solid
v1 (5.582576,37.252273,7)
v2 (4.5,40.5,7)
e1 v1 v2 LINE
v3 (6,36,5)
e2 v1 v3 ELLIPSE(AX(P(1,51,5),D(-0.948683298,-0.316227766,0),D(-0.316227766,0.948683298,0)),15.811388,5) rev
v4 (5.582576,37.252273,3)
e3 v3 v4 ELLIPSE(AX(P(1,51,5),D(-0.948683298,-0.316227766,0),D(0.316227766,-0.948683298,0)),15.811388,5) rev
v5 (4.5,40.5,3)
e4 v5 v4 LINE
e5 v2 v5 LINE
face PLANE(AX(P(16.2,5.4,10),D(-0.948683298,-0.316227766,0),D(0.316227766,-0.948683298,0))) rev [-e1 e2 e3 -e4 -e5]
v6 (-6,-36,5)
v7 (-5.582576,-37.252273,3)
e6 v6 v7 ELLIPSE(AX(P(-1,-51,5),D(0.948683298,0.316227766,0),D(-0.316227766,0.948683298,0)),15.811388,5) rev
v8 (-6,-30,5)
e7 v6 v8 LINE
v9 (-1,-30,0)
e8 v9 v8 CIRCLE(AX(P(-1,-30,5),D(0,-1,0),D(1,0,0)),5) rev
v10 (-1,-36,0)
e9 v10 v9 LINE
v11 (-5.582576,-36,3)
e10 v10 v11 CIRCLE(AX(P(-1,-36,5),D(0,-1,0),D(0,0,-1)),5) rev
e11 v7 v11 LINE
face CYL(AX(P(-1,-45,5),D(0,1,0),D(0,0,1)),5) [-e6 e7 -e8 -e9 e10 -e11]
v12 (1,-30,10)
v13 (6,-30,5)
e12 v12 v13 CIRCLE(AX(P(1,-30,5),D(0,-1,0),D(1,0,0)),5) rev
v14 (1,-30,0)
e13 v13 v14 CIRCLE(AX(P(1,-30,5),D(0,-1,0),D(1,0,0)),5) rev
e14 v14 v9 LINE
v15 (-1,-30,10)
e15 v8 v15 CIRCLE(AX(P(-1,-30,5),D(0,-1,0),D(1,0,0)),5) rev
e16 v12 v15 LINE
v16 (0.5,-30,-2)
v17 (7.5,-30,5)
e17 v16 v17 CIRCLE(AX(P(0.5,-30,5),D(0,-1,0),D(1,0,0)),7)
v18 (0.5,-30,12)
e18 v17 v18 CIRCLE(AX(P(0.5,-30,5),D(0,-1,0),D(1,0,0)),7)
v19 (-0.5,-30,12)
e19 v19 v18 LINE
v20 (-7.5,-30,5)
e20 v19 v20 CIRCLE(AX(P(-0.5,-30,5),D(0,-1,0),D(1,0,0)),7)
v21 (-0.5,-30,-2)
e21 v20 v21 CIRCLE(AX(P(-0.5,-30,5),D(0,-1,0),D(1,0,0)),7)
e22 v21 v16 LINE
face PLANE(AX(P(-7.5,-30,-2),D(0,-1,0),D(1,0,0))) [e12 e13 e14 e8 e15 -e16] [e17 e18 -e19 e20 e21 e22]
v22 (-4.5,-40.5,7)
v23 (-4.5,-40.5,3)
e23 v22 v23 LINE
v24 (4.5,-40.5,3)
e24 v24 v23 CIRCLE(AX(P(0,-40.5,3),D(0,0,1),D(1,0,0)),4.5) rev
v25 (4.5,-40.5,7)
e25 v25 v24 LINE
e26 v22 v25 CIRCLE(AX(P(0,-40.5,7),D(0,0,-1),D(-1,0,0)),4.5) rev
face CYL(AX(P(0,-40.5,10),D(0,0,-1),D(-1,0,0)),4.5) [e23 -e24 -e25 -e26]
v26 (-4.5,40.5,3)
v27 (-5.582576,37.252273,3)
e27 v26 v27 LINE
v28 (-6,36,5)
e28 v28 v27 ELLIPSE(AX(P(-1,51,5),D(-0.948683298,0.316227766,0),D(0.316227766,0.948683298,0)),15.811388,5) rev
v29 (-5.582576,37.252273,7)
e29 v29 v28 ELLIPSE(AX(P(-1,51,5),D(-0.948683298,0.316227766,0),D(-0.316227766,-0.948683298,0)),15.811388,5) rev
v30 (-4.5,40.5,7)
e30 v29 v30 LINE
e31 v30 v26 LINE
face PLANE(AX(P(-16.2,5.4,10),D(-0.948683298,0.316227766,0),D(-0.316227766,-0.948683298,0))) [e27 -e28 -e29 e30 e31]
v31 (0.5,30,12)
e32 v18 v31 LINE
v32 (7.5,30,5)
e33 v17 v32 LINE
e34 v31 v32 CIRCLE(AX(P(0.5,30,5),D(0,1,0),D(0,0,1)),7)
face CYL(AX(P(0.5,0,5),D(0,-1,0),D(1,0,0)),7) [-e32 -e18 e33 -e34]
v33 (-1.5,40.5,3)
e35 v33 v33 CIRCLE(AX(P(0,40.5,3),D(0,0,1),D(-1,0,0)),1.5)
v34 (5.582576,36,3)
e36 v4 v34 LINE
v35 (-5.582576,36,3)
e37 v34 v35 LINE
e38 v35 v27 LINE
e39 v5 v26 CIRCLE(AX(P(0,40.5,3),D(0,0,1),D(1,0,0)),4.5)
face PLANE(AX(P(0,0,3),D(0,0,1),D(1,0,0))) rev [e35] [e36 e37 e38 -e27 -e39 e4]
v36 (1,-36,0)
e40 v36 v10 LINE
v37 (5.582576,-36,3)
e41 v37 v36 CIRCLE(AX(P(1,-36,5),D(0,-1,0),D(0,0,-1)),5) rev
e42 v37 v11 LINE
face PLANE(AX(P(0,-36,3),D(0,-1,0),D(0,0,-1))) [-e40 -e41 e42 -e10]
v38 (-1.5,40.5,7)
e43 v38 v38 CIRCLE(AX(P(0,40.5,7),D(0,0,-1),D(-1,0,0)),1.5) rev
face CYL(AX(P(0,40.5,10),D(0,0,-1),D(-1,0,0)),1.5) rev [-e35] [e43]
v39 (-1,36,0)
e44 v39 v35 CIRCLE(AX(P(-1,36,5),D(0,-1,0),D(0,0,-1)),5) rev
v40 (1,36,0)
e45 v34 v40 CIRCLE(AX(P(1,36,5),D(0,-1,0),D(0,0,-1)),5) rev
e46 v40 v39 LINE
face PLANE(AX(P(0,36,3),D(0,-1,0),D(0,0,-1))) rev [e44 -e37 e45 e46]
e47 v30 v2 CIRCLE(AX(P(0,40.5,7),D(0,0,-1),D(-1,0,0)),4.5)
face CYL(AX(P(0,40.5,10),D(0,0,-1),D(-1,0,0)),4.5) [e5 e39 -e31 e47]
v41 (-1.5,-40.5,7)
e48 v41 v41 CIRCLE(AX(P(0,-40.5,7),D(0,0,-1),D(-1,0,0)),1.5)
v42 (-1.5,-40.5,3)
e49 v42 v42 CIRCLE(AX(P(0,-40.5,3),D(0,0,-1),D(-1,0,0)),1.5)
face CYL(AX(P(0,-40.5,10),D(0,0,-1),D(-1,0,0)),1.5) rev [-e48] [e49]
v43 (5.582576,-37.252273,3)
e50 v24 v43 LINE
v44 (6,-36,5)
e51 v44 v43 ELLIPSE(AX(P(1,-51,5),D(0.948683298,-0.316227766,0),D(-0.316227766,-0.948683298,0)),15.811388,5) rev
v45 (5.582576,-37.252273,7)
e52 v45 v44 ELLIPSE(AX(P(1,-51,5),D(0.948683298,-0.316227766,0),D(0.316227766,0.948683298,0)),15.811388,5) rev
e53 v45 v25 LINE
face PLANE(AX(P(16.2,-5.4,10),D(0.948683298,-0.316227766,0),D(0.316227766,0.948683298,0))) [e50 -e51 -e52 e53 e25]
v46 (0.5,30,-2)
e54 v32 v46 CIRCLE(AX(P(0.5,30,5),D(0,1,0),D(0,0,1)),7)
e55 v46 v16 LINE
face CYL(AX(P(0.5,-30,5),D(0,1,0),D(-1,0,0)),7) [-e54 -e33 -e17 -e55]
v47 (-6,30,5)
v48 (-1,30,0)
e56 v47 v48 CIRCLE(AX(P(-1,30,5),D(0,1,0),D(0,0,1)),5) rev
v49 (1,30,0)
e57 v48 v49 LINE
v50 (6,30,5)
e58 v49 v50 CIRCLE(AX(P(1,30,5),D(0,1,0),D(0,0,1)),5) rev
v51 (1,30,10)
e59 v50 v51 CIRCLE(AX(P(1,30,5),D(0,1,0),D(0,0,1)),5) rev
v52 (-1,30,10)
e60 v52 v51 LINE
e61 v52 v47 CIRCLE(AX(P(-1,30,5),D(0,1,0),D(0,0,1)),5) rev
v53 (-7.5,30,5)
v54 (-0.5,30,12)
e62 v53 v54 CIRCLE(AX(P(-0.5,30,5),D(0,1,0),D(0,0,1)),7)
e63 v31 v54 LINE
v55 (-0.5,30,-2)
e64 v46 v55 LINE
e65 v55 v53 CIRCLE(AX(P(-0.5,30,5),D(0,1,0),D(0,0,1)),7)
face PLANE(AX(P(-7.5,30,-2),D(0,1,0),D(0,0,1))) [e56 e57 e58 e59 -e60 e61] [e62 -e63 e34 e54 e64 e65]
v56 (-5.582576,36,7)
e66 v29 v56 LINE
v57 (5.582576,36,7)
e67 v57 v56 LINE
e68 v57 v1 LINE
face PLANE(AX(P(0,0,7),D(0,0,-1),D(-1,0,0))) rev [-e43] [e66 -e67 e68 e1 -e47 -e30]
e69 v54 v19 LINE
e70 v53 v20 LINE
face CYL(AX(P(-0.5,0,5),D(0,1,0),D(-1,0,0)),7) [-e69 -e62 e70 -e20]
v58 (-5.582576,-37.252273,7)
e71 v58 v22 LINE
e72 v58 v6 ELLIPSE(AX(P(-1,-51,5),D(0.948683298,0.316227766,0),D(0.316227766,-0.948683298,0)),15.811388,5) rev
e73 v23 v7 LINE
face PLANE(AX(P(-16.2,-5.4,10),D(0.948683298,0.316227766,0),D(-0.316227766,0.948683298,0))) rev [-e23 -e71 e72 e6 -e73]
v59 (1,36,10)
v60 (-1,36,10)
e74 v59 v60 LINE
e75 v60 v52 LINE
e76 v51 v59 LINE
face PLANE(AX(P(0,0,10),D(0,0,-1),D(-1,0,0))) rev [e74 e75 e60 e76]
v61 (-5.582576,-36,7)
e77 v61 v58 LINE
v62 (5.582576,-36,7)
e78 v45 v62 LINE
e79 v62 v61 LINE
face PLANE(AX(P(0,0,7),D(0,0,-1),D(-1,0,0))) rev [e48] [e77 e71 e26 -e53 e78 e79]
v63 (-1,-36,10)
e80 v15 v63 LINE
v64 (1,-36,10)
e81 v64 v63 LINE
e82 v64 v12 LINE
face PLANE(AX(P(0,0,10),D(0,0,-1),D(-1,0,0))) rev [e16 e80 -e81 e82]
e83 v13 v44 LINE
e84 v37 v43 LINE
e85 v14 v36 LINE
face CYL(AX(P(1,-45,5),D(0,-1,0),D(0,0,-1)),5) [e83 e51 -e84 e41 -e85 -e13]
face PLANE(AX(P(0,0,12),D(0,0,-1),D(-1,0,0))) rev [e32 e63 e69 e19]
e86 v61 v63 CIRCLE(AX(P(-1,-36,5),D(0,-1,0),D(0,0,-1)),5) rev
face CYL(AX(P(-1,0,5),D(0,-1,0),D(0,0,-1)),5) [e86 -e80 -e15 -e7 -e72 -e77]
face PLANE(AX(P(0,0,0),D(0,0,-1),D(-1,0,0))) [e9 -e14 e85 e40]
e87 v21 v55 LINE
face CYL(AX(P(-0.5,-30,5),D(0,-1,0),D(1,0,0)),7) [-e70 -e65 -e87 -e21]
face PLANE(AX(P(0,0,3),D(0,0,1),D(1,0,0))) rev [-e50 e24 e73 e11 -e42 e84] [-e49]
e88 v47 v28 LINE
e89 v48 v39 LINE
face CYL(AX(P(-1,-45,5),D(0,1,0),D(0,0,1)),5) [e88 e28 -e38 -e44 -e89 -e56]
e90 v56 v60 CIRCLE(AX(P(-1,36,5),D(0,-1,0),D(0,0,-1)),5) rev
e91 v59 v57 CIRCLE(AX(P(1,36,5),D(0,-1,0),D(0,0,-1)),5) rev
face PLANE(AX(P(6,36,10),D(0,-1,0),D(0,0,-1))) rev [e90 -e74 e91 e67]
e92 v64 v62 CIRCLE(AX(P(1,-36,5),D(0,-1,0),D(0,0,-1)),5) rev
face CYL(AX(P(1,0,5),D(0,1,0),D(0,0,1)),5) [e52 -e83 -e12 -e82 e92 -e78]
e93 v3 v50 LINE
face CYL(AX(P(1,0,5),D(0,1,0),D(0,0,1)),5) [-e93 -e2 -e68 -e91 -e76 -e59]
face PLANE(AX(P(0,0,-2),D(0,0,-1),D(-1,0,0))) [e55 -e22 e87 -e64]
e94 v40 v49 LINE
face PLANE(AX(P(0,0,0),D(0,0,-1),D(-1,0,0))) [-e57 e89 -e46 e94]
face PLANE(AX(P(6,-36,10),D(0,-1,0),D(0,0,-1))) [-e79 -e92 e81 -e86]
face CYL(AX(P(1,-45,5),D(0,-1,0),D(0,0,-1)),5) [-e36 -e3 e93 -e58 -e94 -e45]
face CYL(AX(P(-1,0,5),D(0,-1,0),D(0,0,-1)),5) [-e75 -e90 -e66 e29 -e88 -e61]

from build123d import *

# Parameters (mm, degrees)
SKETCH2_W                = 12
SKETCH2_H                = 90
BOSS_EXTRUDE1_DEPTH      = 10
FILLET1_R                = 5
CUT_EXTRUDE1_DEPTH       = 3
CUT_EXTRUDE2_START       = 7
SKETCH3_2_W              = 12
SKETCH3_2_H              = 9
CUT_EXTRUDE2_DEPTH       = 3
CUT_EXTRUDE4_START       = -4
CUT_EXTRUDE4_DEPTH       = 51.486557197
SKETCH7_R                = 1.5
CUT_EXTRUDE5_DEPTH       = 46.934736311
BOSS_EXTRUDE2_DEPTH      = 7
BOSS_EXTRUDE2_DEPTH_BACK = 7
SKETCH9_W                = 15
SKETCH9_H                = 60
FILLET3_R                = 7


with BuildPart() as part:
    # Sketch2 → Boss-Extrude1 (new body)
    with BuildSketch(Plane.XY):
        Rectangle(SKETCH2_W, SKETCH2_H)
    extrude(amount=BOSS_EXTRUDE1_DEPTH)

    # Fillet1
    fillet1_edges = [part.edges().sort_by_distance(p)[0] for p in [
        (-6, 0, 0),
        (6, 0, 0),
        (6, 0, 10),
        (-6, 0, 10),
    ]]
    fillet(fillet1_edges, radius=FILLET1_R - 0.0001)  # a hair under: the kernel refuses the full size

    # Sketch3 → Cut-Extrude1 (cut)
    with BuildSketch(Plane.XY):
        with BuildLine():
            Line((-6, -36), (-4.5, -40.5))
            ThreePointArc((-4.5, -40.5), (0, -45), (4.5, -40.5))
            Line((4.5, -40.5), (6, -36))
            Line((6, -36), (-6, -36))
        make_face()
        with BuildLine():
            Line((-3.9e-08, -45), (6, -45))
            Line((6, -45), (6, -36))
            Line((6, -36), (4.5, -40.5))
            ThreePointArc((4.5, -40.5), (3.181980501, -43.681980529), (-3.9e-08, -45))
        make_face()
        with BuildLine():
            Line((-6, -45), (-3.9e-08, -45))
            ThreePointArc((-3.9e-08, -45), (-3.181980529, -43.681980501), (-4.5, -40.5))
            Line((-4.5, -40.5), (-6, -36))
            Line((-6, -36), (-6, -45))
        make_face()
    cut_extrude1 = extrude(amount=CUT_EXTRUDE1_DEPTH, mode=Mode.SUBTRACT)

    # Sketch3<2> → Cut-Extrude2 (cut)
    with BuildSketch(Plane.XY.offset(CUT_EXTRUDE2_START)):
        with Locations((0, -40.5)):
            Rectangle(SKETCH3_2_W, SKETCH3_2_H)
    cut_extrude2 = extrude(amount=CUT_EXTRUDE2_DEPTH, mode=Mode.SUBTRACT)

    # Mirror1: Cut-Extrude1, Cut-Extrude2 across plane
    add(cut_extrude1.mirror(Plane.ZX), mode=Mode.SUBTRACT)
    add(cut_extrude2.mirror(Plane.ZX), mode=Mode.SUBTRACT)

    # Sketch3<4> → Cut-Extrude4 (cut)
    with BuildSketch(Plane.XY.offset(CUT_EXTRUDE4_START)):
        with BuildLine():
            Line((-3.9e-08, -45), (6, -45))
            Line((6, -45), (6, -36))
            Line((6, -36), (4.5, -40.5))
            ThreePointArc((4.5, -40.5), (3.181980501, -43.681980529), (-3.9e-08, -45))
        make_face()
        with BuildLine():
            Line((-6, -45), (-3.9e-08, -45))
            ThreePointArc((-3.9e-08, -45), (-3.181980529, -43.681980501), (-4.5, -40.5))
            Line((-4.5, -40.5), (-6, -36))
            Line((-6, -36), (-6, -45))
        make_face()
    cut_extrude4 = extrude(amount=CUT_EXTRUDE4_DEPTH, mode=Mode.SUBTRACT)

    # Sketch7 → Cut-Extrude5 (cut, through all)
    with BuildSketch(Plane(origin=(0, 0, 3), x_dir=(-1, 0, 0), z_dir=(0, 0, -1))):
        with Locations((0, -40.5)):
            Circle(SKETCH7_R)
    cut_extrude5 = extrude(amount=-CUT_EXTRUDE5_DEPTH, mode=Mode.SUBTRACT)

    # Mirror3: Cut-Extrude5 across plane
    add(cut_extrude5.mirror(Plane.ZX), mode=Mode.SUBTRACT)

    # Mirror4: Cut-Extrude4 across plane
    add(cut_extrude4.mirror(Plane.ZX), mode=Mode.SUBTRACT)

    # Sketch9 → Boss-Extrude2 (add, two sides: drawn at the far end of the back side and taken through both)
    with BuildSketch(Plane.XY.offset(5).offset(-BOSS_EXTRUDE2_DEPTH_BACK)):
        Rectangle(SKETCH9_W, SKETCH9_H)
    extrude(amount=BOSS_EXTRUDE2_DEPTH + BOSS_EXTRUDE2_DEPTH_BACK)

    # Fillet3
    fillet3_edges = [part.edges().sort_by_distance(p)[0] for p in [
        (-7.5, 0, 12),
        (7.5, 0, 12),
        (7.5, 0, -2),
        (-7.5, 0, -2),
    ]]
    fillet(fillet3_edges, radius=FILLET3_R - 0.0001)  # a hair under: the kernel refuses the full size


solid = part.part
